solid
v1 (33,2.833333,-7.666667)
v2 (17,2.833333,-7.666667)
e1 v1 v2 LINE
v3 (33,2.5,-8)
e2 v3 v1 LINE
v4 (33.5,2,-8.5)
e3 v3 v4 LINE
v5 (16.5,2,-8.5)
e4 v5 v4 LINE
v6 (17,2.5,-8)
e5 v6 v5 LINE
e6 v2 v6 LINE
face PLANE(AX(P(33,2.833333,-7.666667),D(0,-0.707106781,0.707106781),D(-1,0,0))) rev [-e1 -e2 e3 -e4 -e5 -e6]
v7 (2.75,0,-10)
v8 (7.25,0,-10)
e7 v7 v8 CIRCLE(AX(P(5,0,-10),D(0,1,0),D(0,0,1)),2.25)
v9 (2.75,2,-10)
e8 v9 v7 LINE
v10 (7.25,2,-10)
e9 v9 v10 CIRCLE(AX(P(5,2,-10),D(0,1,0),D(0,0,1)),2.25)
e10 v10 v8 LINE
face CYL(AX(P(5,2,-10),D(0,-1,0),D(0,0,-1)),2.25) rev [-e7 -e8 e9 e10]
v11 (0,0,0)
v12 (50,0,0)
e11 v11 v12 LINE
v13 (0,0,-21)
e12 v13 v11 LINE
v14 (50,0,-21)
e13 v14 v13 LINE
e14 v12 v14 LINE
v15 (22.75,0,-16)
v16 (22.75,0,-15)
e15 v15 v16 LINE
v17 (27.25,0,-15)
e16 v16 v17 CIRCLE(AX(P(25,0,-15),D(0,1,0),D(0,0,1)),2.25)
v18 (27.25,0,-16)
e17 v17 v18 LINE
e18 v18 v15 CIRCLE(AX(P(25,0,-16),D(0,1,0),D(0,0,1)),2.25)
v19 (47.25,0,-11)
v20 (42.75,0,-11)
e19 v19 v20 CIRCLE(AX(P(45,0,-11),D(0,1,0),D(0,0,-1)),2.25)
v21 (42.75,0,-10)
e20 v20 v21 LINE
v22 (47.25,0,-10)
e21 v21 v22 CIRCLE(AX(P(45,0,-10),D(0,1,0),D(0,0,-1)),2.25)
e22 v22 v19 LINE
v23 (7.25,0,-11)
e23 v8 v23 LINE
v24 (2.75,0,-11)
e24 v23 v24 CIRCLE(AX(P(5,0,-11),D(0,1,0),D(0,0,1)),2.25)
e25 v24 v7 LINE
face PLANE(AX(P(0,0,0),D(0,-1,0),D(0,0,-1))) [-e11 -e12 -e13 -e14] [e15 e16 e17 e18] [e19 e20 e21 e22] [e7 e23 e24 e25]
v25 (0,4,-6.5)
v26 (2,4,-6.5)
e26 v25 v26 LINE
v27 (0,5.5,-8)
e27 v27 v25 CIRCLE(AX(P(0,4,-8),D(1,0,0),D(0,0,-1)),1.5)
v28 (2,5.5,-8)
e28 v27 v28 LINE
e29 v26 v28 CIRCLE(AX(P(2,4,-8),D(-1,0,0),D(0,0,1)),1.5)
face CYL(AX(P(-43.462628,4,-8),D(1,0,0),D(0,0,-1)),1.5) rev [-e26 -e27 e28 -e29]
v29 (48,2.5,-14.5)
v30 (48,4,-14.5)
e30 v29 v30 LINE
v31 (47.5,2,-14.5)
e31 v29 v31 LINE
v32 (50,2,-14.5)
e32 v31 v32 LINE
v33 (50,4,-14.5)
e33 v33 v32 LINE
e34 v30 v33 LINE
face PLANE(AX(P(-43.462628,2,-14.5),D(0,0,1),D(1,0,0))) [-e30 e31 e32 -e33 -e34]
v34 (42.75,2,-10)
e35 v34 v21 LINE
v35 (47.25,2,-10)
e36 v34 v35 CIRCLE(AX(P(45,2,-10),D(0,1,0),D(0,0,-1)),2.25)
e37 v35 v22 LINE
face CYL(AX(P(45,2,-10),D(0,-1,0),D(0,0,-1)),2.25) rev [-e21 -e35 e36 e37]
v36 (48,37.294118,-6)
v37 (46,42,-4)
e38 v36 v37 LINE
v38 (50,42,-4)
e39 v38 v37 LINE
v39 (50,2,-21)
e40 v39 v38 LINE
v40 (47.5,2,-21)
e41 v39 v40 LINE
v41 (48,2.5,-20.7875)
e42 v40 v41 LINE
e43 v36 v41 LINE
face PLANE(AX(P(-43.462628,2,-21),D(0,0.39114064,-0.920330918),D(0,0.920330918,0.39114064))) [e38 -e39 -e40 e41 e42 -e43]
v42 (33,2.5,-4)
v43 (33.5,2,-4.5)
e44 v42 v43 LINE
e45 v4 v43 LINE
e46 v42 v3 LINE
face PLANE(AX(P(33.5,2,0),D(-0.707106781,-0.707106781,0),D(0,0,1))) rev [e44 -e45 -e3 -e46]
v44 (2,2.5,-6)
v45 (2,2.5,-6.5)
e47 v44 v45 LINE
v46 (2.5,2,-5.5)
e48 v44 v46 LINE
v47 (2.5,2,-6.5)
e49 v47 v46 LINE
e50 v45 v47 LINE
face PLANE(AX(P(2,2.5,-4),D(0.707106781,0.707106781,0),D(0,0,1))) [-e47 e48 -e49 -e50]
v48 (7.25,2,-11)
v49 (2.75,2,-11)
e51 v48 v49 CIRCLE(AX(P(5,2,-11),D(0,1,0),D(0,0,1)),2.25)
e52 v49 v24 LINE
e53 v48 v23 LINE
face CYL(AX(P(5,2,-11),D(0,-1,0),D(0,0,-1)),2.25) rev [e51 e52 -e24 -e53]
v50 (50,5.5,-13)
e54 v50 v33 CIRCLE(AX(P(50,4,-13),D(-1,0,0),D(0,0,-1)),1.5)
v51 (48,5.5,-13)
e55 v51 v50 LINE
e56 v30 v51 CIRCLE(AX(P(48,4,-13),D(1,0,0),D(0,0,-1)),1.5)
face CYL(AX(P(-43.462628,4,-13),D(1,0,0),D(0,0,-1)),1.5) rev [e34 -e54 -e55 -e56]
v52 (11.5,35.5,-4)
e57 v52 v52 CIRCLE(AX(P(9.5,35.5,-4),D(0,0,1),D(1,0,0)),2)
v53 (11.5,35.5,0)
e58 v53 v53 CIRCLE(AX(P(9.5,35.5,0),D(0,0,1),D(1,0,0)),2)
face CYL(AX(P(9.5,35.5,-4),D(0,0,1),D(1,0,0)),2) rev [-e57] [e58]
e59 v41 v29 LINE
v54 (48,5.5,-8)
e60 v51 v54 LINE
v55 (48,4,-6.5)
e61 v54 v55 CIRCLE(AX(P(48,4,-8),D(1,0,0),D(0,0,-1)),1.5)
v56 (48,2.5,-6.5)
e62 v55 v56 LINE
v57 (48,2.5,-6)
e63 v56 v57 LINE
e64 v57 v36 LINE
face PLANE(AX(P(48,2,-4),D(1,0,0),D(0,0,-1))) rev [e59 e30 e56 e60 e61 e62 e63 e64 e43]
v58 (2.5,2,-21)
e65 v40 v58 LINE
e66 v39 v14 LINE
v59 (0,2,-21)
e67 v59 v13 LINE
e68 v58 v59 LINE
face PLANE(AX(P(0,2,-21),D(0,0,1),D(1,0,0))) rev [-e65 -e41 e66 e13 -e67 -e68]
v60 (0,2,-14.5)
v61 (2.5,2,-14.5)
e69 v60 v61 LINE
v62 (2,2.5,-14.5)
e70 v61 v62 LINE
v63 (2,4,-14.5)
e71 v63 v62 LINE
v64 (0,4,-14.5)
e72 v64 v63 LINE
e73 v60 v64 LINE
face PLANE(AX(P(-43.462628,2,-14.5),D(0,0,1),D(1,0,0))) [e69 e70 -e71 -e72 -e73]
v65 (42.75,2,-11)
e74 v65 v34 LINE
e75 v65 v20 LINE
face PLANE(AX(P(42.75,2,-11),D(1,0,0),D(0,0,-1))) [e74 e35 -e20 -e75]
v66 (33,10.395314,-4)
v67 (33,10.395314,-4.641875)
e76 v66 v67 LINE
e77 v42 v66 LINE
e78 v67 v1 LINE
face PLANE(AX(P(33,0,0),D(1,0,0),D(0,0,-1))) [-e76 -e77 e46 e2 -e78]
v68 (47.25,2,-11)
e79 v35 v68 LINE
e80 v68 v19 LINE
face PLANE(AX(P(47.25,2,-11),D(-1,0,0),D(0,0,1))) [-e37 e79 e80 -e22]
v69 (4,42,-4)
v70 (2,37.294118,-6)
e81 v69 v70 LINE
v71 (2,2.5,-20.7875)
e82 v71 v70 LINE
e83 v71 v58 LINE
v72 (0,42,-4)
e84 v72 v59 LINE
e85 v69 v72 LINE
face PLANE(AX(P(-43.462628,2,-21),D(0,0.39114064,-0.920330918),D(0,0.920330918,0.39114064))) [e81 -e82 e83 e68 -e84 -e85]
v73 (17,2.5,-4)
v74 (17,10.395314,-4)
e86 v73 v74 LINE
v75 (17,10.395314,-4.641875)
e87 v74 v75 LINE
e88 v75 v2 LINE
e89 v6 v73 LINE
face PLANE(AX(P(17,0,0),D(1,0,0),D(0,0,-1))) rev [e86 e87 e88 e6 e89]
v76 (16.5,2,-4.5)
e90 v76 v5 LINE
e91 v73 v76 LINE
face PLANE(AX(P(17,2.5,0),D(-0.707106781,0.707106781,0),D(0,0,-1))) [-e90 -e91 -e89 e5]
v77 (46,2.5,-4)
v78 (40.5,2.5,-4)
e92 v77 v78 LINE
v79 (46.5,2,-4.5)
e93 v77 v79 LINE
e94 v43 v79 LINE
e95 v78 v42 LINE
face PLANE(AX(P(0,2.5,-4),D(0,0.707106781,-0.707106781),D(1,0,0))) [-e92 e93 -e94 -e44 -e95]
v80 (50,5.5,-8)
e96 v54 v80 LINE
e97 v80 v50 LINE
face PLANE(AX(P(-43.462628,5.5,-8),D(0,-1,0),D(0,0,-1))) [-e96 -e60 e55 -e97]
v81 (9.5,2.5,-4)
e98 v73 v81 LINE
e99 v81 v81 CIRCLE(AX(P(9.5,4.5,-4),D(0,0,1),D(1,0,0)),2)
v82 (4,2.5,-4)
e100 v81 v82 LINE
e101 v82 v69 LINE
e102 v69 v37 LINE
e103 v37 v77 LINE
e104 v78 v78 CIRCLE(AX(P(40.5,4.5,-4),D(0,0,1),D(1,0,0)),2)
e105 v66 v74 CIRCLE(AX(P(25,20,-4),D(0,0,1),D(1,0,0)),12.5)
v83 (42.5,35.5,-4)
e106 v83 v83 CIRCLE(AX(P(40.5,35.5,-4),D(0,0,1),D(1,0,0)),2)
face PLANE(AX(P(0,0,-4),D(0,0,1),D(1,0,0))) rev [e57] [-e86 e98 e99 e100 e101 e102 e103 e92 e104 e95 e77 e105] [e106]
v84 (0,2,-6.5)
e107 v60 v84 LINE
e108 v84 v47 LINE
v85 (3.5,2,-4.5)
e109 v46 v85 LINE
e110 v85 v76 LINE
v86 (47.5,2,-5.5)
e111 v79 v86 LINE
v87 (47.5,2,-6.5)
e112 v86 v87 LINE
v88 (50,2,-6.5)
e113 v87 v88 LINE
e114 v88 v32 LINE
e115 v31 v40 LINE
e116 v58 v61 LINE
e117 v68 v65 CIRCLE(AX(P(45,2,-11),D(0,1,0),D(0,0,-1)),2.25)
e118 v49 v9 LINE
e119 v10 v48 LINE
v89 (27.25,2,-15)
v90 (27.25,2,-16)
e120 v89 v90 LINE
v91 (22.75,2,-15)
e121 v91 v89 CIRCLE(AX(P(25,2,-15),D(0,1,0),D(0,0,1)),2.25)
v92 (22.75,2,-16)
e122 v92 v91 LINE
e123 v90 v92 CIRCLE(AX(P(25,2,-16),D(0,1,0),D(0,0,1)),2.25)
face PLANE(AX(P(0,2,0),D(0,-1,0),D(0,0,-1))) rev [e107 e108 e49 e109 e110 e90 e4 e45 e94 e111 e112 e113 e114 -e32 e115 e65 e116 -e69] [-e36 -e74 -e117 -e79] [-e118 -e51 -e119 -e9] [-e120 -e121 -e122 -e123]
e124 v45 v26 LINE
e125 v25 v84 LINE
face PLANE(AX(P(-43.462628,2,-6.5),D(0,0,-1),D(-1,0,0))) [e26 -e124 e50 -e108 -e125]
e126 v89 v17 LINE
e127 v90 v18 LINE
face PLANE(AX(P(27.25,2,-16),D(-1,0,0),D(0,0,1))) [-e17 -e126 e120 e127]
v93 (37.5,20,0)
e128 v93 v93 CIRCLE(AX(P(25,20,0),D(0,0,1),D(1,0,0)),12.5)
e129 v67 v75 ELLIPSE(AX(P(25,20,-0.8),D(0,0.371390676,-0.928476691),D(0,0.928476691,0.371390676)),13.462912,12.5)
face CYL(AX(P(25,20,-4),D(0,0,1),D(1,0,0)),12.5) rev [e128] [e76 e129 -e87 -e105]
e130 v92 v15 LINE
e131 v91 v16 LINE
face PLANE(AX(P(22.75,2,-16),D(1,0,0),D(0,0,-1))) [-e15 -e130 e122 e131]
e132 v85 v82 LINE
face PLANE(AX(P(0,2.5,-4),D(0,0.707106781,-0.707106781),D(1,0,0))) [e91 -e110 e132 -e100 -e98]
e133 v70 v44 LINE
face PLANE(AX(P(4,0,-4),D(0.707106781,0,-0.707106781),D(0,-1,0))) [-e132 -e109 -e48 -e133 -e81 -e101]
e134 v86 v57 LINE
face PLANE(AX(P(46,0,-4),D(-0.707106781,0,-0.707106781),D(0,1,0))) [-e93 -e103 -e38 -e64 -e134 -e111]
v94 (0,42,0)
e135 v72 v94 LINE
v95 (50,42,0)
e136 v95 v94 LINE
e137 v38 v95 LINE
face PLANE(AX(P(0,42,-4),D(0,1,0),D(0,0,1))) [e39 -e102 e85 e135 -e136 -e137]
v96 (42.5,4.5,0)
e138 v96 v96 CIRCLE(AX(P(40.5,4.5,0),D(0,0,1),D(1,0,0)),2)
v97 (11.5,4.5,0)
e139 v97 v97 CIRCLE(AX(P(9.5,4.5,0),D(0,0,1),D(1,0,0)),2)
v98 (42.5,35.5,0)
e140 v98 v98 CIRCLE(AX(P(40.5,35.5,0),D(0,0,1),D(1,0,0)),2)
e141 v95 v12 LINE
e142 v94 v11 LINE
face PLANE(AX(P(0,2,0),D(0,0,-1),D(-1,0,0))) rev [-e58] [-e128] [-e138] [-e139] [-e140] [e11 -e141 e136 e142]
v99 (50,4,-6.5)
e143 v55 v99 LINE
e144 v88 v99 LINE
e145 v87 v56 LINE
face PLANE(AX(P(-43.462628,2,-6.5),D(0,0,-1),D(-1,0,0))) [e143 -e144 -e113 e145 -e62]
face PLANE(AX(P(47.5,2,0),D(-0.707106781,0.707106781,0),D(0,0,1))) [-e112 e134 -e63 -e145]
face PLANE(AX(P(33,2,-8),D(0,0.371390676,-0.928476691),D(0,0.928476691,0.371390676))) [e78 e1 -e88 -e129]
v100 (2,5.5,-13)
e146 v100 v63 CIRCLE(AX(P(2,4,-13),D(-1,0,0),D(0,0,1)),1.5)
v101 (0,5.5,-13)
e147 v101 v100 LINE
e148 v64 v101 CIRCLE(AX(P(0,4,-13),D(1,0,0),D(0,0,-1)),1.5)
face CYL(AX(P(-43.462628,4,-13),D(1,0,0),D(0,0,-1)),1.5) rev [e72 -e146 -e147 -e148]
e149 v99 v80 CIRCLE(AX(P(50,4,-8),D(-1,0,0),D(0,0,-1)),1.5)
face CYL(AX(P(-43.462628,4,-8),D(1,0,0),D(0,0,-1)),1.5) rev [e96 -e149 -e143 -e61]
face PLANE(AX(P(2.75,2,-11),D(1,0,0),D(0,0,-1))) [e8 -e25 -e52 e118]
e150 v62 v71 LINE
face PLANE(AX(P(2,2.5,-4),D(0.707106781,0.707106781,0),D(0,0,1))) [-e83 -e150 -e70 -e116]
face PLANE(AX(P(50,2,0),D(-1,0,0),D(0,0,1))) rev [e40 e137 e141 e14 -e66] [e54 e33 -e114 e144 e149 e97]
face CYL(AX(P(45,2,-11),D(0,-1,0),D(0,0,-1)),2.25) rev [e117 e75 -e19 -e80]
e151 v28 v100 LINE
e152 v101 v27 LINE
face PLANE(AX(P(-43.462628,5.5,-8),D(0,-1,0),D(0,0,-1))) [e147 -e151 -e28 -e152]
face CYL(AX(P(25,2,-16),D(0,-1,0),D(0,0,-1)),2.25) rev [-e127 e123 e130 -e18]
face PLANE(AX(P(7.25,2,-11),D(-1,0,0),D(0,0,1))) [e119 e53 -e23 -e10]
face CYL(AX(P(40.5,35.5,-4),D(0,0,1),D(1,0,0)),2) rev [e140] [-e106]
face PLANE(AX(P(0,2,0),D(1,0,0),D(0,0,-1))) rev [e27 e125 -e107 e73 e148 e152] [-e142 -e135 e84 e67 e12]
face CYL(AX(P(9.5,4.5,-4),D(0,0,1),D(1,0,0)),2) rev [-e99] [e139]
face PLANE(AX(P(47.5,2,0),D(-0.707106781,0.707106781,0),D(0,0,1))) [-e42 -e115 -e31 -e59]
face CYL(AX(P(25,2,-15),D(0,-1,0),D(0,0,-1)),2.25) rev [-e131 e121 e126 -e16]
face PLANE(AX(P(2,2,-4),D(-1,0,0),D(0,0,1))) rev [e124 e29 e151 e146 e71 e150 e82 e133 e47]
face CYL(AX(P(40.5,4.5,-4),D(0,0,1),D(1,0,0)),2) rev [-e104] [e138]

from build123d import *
from OCP.BRepFilletAPI import BRepFilletAPI_MakeChamfer

# Parameters (mm, degrees)
SKETCH1_W                  = 50
SKETCH1_H                  = 21
BASE_DEPTH                 = 2
SKETCH2_W                  = 50
SKETCH2_H                  = 42
SKETCH2_R                  = 2
SKETCH2_R_2                = 12.5
ENCAIXE_MOTOR_DEPTH        = 4
LATERAIS_START             = -50
LATERAIS_BLOCO_DEPTH       = 50
LATERAIS_START_2           = -17
SKETCH4_W                  = 46
SKETCH4_H                  = 40
LATERAIS_CORTE_DEPTH       = 17
SUPORTE_CENTRAL_DEPTH      = 8
SUPORTE_CENTRAL_DEPTH_BACK = 8
SKETCH6_R                  = 12.5
FURO_MOTOR_25_DEPTH        = 68.475921631
CHANFROS_1X45_SIZE         = 0.5
CHANFROS_1X45_SIZE_2       = 0.897527468
CHANFROS_2X45_SIZE         = 2


# Some blends are built 0.0001 mm under size
with BuildPart() as part:
    # Sketch1 → Base (new body)
    with BuildSketch(Plane(origin=(0, 0, 0), x_dir=(1, 0, 0), z_dir=(0, 1, 0))):
        with Locations((25, 10.5)):
            Rectangle(SKETCH1_W, SKETCH1_H)
        with BuildLine():
            Line((7.25, 11), (7.25, 10))
            ThreePointArc((7.25, 10), (5, 7.75), (2.75, 10))
            Line((2.75, 10), (2.75, 11))
            ThreePointArc((2.75, 11), (5, 13.25), (7.25, 11))
        make_face(mode=Mode.SUBTRACT)
        with BuildLine():
            Line((42.75, 11), (42.75, 10))
            ThreePointArc((42.75, 10), (45, 7.75), (47.25, 10))
            Line((47.25, 10), (47.25, 11))
            ThreePointArc((47.25, 11), (45, 13.25), (42.75, 11))
        make_face(mode=Mode.SUBTRACT)
        with BuildLine():
            Line((27.25, 16), (27.25, 15))
            ThreePointArc((27.25, 15), (25, 12.75), (22.75, 15))
            Line((22.75, 15), (22.75, 16))
            ThreePointArc((22.75, 16), (25, 18.25), (27.25, 16))
        make_face(mode=Mode.SUBTRACT)
    extrude(amount=BASE_DEPTH)

    # Sketch2 → Encaixe Motor (add)
    with BuildSketch(Plane.XY):
        with Locations((25, 21)):
            Rectangle(SKETCH2_W, SKETCH2_H)
        with Locations((9.5, 35.5)):
            Circle(SKETCH2_R, mode=Mode.SUBTRACT)
        with Locations((9.5, 4.5)):
            Circle(SKETCH2_R, mode=Mode.SUBTRACT)
        with Locations((40.5, 4.5)):
            Circle(SKETCH2_R, mode=Mode.SUBTRACT)
        with Locations((40.5, 35.5)):
            Circle(SKETCH2_R, mode=Mode.SUBTRACT)
        with Locations((25, 20)):
            Circle(SKETCH2_R_2, mode=Mode.SUBTRACT)
    extrude(amount=-ENCAIXE_MOTOR_DEPTH)

    # Sketch3 → Laterais - Bloco (add)
    with BuildSketch(Plane(origin=(50, 0, 0), x_dir=(0, 0, -1), z_dir=(1, 0, 0)).offset(LATERAIS_START)):
        with BuildLine():
            Line((21, 2), (4, 42))
            Line((4, 42), (4, 2))
            Line((4, 2), (6.5, 2))
            Line((6.5, 2), (6.5, 4))
            ThreePointArc((6.5, 4), (6.939339828, 5.060660172), (8, 5.5))
            Line((8, 5.5), (13, 5.5))
            ThreePointArc((13, 5.5), (14.060660172, 5.060660172), (14.5, 4))
            Line((14.5, 4), (14.5, 2))
            Line((14.5, 2), (21, 2))
        make_face()
    extrude(amount=LATERAIS_BLOCO_DEPTH)

    # Sketch4 → Laterais - Corte (cut)
    with BuildSketch(Plane(origin=(0, 0, -21), x_dir=(-1, 0, 0), z_dir=(0, 0, -1)).offset(LATERAIS_START_2)):
        with Locations((-25, 22)):
            Rectangle(SKETCH4_W, SKETCH4_H)
    extrude(amount=LATERAIS_CORTE_DEPTH, mode=Mode.SUBTRACT)

    # Sketch5 → Suporte Central (add, two sides: drawn at the far end of the back side and taken through both)
    with BuildSketch(Plane.ZY.offset(-25).offset(-SUPORTE_CENTRAL_DEPTH_BACK)):
        Polygon((-4, 2), (-8, 2), (-4, 12), align=None)
    extrude(amount=SUPORTE_CENTRAL_DEPTH + SUPORTE_CENTRAL_DEPTH_BACK)

    # Sketch6 → Furo Motor Ø25 (cut, through all)
    with BuildSketch(Plane.XY.offset(-4)):
        with Locations((25, 20)):
            Circle(SKETCH6_R)
    extrude(amount=-FURO_MOTOR_25_DEPTH, mode=Mode.SUBTRACT)

    # Chanfros 1x45°
    chanfros_1x45_edges_1 = [part.edges().sort_by_distance(p)[0] for p in [
        (2, 2, -17.75),
        (48, 2, -17.75),
        (48, 2, -5.25),
        (40.5, 2, -4),
        (2, 2, -5.25),
        (9.5, 2, -4),
        (33, 2, -6),
        (17, 2, -6),
    ]]
    chanfros_1x45_edges_2 = [part.edges().sort_by_distance(p)[0] for p in [
        (25, 2, -8),
    ]]
    chanfros_1x45_side_2 = [part.faces().sort_by_distance(p)[0] for p in [
        (25, 2, -8.01),
    ]]
    chanfros_1x45 = BRepFilletAPI_MakeChamfer(part.part.solid().wrapped)
    for e in chanfros_1x45_edges_1:
        chanfros_1x45.Add(CHANFROS_1X45_SIZE - 0.0001, e.wrapped)
    for e in chanfros_1x45_edges_2:
        chanfros_1x45.Add(CHANFROS_1X45_SIZE - 0.0001, CHANFROS_1X45_SIZE_2 - 0.0001, e.wrapped, chanfros_1x45_side_2[0].wrapped)
    add(Compound.cast(chanfros_1x45.Shape()), mode=Mode.REPLACE)  # a hair under: the kernel refuses the full size

    # Chanfros 2x45°
    # the kernel refuses this chamfer: 2 mm, written as the material it adds along each edge
    with BuildSketch(Plane(origin=(48, 42, -4), x_dir=(-0.9996219169112968, 0, 0.027495876610586726), z_dir=(0, -1, 0))) as chanfros_2x45_piece_1_section:
        Polygon((CHANFROS_2X45_SIZE * 0.999621916911, CHANFROS_2X45_SIZE * 0.0274958766106), (-CHANFROS_2X45_SIZE * 0.0274958766106, CHANFROS_2X45_SIZE * 0.999621916911), (0, 0), align=None)
    chanfros_2x45_piece_1 = extrude(amount=44.643465976, mode=Mode.PRIVATE)
    chanfros_2x45_piece_1 = split(chanfros_2x45_piece_1, bisect_by=Plane(origin=(47.331403888, 24.268482908, -11.535894764), z_dir=(0, -0.3911406403448519, 0.9203309184584747)), keep=Keep.TOP, mode=Mode.PRIVATE)
    chanfros_2x45_piece_1 = split(chanfros_2x45_piece_1, bisect_by=Plane(origin=(47.331403888, 11.597453936, 5.097553936), z_dir=(0, 0.7071067811865476, -0.7071067811865476)), keep=Keep.TOP, mode=Mode.PRIVATE)
    chanfros_2x45_piece_1 = split(chanfros_2x45_piece_1, bisect_by=Plane(origin=(57.08562089, 11.58552089, -4.64473002), z_dir=(-0.70710678118655, 0.707106781186545, 0)), keep=Keep.TOP, mode=Mode.PRIVATE)
    add(chanfros_2x45_piece_1)
    with BuildSketch(Plane(origin=(48, 42, -4), x_dir=(-0.9996219169112968, 0, 0.027495876610586726), z_dir=(0, -1, 0))) as chanfros_2x45_piece_2_section:
        Polygon((CHANFROS_2X45_SIZE * 0.999621916911, CHANFROS_2X45_SIZE * 0.0274958766106), (-CHANFROS_2X45_SIZE * 0.0274958766106, CHANFROS_2X45_SIZE * 0.999621916911), (0, 0), align=None)
    chanfros_2x45_piece_2 = extrude(amount=44.643465976, mode=Mode.PRIVATE)
    chanfros_2x45_piece_2 = split(chanfros_2x45_piece_2, bisect_by=Plane(origin=(47.794441496, 1.480569573, -5.019330427), z_dir=(0, 0.7071067811865476, -0.7071067811865476)), keep=Keep.TOP, mode=Mode.PRIVATE)
    chanfros_2x45_piece_2 = split(chanfros_2x45_piece_2, bisect_by=Plane(origin=(47.523184188, 2.023084188, -5.290587735), z_dir=(0.70710678118655, -0.707106781186545, 0)), keep=Keep.TOP, mode=Mode.PRIVATE)
    add(chanfros_2x45_piece_2)
    with BuildSketch(Plane(origin=(48, 42, -4), x_dir=(-0.9996219169112968, 0, 0.027495876610586726), z_dir=(0, -1, 0))) as chanfros_2x45_piece_3_section:
        Polygon((CHANFROS_2X45_SIZE * 0.999621916911, CHANFROS_2X45_SIZE * 0.0274958766106), (-CHANFROS_2X45_SIZE * 0.0274958766106, CHANFROS_2X45_SIZE * 0.999621916911), (0, 0), align=None)
    chanfros_2x45_piece_3 = extrude(amount=44.643465976, mode=Mode.PRIVATE)
    chanfros_2x45_piece_3 = split(chanfros_2x45_piece_3, bisect_by=Plane(origin=(46.709412265, 2.023084188, -4.476815812), z_dir=(0, -0.7071067811865476, 0.7071067811865476)), keep=Keep.TOP, mode=Mode.PRIVATE)
    chanfros_2x45_piece_3 = split(chanfros_2x45_piece_3, bisect_by=Plane(origin=(46.980669573, 1.480569573, -4.205558504), z_dir=(-0.70710678118655, 0.707106781186545, 0)), keep=Keep.TOP, mode=Mode.PRIVATE)
    add(chanfros_2x45_piece_3)
    with BuildSketch(Plane(origin=(2, -2.643465976, -4), x_dir=(0.9996219169112968, 0, 0.027495876610585838), z_dir=(0, 1, 0))) as chanfros_2x45_piece_4_section:
        Polygon((CHANFROS_2X45_SIZE * 0.999621916911, CHANFROS_2X45_SIZE * 0.0274958766106), (-CHANFROS_2X45_SIZE * 0.0274958766106, CHANFROS_2X45_SIZE * 0.999621916911), (0, 0), align=None)
    chanfros_2x45_piece_4 = extrude(amount=44.643465976, mode=Mode.PRIVATE)
    chanfros_2x45_piece_4 = split(chanfros_2x45_piece_4, bisect_by=Plane(origin=(2.205558504, 1.480569573, -5.019330427), z_dir=(0, 0.7071067811865476, -0.7071067811865476)), keep=Keep.TOP, mode=Mode.PRIVATE)
    chanfros_2x45_piece_4 = split(chanfros_2x45_piece_4, bisect_by=Plane(origin=(2.476815812, 2.023084188, -5.290587735), z_dir=(-0.7071067811865479, -0.7071067811865472, 0)), keep=Keep.TOP, mode=Mode.PRIVATE)
    add(chanfros_2x45_piece_4)
    with BuildSketch(Plane(origin=(2, -2.643465976, -4), x_dir=(0.9996219169112968, 0, 0.027495876610585838), z_dir=(0, 1, 0))) as chanfros_2x45_piece_5_section:
        Polygon((CHANFROS_2X45_SIZE * 0.999621916911, CHANFROS_2X45_SIZE * 0.0274958766106), (-CHANFROS_2X45_SIZE * 0.0274958766106, CHANFROS_2X45_SIZE * 0.999621916911), (0, 0), align=None)
    chanfros_2x45_piece_5 = extrude(amount=44.643465976, mode=Mode.PRIVATE)
    chanfros_2x45_piece_5 = split(chanfros_2x45_piece_5, bisect_by=Plane(origin=(3.290587735, 2.023084188, -4.476815812), z_dir=(0, -0.7071067811865476, 0.7071067811865476)), keep=Keep.TOP, mode=Mode.PRIVATE)
    chanfros_2x45_piece_5 = split(chanfros_2x45_piece_5, bisect_by=Plane(origin=(3.019330427, 1.480569573, -4.205558504), z_dir=(0.7071067811865479, 0.7071067811865472, 0)), keep=Keep.TOP, mode=Mode.PRIVATE)
    add(chanfros_2x45_piece_5)
    with BuildSketch(Plane(origin=(2, -2.643465976, -4), x_dir=(0.9996219169112968, 0, 0.027495876610585838), z_dir=(0, 1, 0))) as chanfros_2x45_piece_6_section:
        Polygon((CHANFROS_2X45_SIZE * 0.999621916911, CHANFROS_2X45_SIZE * 0.0274958766106), (-CHANFROS_2X45_SIZE * 0.0274958766106, CHANFROS_2X45_SIZE * 0.999621916911), (0, 0), align=None)
    chanfros_2x45_piece_6 = extrude(amount=44.643465976, mode=Mode.PRIVATE)
    chanfros_2x45_piece_6 = split(chanfros_2x45_piece_6, bisect_by=Plane(origin=(2.668596112, 11.597453936, 5.097553936), z_dir=(0, 0.7071067811865476, -0.7071067811865476)), keep=Keep.TOP, mode=Mode.PRIVATE)
    chanfros_2x45_piece_6 = split(chanfros_2x45_piece_6, bisect_by=Plane(origin=(-7.08562089, 11.58552089, -4.64473002), z_dir=(0.7071067811865479, 0.7071067811865472, 0)), keep=Keep.TOP, mode=Mode.PRIVATE)
    chanfros_2x45_piece_6 = split(chanfros_2x45_piece_6, bisect_by=Plane(origin=(2.668596112, 24.268482908, -11.535894764), z_dir=(0, -0.3911406403448519, 0.9203309184584747)), keep=Keep.TOP, mode=Mode.PRIVATE)
    add(chanfros_2x45_piece_6)


solid = part.part
